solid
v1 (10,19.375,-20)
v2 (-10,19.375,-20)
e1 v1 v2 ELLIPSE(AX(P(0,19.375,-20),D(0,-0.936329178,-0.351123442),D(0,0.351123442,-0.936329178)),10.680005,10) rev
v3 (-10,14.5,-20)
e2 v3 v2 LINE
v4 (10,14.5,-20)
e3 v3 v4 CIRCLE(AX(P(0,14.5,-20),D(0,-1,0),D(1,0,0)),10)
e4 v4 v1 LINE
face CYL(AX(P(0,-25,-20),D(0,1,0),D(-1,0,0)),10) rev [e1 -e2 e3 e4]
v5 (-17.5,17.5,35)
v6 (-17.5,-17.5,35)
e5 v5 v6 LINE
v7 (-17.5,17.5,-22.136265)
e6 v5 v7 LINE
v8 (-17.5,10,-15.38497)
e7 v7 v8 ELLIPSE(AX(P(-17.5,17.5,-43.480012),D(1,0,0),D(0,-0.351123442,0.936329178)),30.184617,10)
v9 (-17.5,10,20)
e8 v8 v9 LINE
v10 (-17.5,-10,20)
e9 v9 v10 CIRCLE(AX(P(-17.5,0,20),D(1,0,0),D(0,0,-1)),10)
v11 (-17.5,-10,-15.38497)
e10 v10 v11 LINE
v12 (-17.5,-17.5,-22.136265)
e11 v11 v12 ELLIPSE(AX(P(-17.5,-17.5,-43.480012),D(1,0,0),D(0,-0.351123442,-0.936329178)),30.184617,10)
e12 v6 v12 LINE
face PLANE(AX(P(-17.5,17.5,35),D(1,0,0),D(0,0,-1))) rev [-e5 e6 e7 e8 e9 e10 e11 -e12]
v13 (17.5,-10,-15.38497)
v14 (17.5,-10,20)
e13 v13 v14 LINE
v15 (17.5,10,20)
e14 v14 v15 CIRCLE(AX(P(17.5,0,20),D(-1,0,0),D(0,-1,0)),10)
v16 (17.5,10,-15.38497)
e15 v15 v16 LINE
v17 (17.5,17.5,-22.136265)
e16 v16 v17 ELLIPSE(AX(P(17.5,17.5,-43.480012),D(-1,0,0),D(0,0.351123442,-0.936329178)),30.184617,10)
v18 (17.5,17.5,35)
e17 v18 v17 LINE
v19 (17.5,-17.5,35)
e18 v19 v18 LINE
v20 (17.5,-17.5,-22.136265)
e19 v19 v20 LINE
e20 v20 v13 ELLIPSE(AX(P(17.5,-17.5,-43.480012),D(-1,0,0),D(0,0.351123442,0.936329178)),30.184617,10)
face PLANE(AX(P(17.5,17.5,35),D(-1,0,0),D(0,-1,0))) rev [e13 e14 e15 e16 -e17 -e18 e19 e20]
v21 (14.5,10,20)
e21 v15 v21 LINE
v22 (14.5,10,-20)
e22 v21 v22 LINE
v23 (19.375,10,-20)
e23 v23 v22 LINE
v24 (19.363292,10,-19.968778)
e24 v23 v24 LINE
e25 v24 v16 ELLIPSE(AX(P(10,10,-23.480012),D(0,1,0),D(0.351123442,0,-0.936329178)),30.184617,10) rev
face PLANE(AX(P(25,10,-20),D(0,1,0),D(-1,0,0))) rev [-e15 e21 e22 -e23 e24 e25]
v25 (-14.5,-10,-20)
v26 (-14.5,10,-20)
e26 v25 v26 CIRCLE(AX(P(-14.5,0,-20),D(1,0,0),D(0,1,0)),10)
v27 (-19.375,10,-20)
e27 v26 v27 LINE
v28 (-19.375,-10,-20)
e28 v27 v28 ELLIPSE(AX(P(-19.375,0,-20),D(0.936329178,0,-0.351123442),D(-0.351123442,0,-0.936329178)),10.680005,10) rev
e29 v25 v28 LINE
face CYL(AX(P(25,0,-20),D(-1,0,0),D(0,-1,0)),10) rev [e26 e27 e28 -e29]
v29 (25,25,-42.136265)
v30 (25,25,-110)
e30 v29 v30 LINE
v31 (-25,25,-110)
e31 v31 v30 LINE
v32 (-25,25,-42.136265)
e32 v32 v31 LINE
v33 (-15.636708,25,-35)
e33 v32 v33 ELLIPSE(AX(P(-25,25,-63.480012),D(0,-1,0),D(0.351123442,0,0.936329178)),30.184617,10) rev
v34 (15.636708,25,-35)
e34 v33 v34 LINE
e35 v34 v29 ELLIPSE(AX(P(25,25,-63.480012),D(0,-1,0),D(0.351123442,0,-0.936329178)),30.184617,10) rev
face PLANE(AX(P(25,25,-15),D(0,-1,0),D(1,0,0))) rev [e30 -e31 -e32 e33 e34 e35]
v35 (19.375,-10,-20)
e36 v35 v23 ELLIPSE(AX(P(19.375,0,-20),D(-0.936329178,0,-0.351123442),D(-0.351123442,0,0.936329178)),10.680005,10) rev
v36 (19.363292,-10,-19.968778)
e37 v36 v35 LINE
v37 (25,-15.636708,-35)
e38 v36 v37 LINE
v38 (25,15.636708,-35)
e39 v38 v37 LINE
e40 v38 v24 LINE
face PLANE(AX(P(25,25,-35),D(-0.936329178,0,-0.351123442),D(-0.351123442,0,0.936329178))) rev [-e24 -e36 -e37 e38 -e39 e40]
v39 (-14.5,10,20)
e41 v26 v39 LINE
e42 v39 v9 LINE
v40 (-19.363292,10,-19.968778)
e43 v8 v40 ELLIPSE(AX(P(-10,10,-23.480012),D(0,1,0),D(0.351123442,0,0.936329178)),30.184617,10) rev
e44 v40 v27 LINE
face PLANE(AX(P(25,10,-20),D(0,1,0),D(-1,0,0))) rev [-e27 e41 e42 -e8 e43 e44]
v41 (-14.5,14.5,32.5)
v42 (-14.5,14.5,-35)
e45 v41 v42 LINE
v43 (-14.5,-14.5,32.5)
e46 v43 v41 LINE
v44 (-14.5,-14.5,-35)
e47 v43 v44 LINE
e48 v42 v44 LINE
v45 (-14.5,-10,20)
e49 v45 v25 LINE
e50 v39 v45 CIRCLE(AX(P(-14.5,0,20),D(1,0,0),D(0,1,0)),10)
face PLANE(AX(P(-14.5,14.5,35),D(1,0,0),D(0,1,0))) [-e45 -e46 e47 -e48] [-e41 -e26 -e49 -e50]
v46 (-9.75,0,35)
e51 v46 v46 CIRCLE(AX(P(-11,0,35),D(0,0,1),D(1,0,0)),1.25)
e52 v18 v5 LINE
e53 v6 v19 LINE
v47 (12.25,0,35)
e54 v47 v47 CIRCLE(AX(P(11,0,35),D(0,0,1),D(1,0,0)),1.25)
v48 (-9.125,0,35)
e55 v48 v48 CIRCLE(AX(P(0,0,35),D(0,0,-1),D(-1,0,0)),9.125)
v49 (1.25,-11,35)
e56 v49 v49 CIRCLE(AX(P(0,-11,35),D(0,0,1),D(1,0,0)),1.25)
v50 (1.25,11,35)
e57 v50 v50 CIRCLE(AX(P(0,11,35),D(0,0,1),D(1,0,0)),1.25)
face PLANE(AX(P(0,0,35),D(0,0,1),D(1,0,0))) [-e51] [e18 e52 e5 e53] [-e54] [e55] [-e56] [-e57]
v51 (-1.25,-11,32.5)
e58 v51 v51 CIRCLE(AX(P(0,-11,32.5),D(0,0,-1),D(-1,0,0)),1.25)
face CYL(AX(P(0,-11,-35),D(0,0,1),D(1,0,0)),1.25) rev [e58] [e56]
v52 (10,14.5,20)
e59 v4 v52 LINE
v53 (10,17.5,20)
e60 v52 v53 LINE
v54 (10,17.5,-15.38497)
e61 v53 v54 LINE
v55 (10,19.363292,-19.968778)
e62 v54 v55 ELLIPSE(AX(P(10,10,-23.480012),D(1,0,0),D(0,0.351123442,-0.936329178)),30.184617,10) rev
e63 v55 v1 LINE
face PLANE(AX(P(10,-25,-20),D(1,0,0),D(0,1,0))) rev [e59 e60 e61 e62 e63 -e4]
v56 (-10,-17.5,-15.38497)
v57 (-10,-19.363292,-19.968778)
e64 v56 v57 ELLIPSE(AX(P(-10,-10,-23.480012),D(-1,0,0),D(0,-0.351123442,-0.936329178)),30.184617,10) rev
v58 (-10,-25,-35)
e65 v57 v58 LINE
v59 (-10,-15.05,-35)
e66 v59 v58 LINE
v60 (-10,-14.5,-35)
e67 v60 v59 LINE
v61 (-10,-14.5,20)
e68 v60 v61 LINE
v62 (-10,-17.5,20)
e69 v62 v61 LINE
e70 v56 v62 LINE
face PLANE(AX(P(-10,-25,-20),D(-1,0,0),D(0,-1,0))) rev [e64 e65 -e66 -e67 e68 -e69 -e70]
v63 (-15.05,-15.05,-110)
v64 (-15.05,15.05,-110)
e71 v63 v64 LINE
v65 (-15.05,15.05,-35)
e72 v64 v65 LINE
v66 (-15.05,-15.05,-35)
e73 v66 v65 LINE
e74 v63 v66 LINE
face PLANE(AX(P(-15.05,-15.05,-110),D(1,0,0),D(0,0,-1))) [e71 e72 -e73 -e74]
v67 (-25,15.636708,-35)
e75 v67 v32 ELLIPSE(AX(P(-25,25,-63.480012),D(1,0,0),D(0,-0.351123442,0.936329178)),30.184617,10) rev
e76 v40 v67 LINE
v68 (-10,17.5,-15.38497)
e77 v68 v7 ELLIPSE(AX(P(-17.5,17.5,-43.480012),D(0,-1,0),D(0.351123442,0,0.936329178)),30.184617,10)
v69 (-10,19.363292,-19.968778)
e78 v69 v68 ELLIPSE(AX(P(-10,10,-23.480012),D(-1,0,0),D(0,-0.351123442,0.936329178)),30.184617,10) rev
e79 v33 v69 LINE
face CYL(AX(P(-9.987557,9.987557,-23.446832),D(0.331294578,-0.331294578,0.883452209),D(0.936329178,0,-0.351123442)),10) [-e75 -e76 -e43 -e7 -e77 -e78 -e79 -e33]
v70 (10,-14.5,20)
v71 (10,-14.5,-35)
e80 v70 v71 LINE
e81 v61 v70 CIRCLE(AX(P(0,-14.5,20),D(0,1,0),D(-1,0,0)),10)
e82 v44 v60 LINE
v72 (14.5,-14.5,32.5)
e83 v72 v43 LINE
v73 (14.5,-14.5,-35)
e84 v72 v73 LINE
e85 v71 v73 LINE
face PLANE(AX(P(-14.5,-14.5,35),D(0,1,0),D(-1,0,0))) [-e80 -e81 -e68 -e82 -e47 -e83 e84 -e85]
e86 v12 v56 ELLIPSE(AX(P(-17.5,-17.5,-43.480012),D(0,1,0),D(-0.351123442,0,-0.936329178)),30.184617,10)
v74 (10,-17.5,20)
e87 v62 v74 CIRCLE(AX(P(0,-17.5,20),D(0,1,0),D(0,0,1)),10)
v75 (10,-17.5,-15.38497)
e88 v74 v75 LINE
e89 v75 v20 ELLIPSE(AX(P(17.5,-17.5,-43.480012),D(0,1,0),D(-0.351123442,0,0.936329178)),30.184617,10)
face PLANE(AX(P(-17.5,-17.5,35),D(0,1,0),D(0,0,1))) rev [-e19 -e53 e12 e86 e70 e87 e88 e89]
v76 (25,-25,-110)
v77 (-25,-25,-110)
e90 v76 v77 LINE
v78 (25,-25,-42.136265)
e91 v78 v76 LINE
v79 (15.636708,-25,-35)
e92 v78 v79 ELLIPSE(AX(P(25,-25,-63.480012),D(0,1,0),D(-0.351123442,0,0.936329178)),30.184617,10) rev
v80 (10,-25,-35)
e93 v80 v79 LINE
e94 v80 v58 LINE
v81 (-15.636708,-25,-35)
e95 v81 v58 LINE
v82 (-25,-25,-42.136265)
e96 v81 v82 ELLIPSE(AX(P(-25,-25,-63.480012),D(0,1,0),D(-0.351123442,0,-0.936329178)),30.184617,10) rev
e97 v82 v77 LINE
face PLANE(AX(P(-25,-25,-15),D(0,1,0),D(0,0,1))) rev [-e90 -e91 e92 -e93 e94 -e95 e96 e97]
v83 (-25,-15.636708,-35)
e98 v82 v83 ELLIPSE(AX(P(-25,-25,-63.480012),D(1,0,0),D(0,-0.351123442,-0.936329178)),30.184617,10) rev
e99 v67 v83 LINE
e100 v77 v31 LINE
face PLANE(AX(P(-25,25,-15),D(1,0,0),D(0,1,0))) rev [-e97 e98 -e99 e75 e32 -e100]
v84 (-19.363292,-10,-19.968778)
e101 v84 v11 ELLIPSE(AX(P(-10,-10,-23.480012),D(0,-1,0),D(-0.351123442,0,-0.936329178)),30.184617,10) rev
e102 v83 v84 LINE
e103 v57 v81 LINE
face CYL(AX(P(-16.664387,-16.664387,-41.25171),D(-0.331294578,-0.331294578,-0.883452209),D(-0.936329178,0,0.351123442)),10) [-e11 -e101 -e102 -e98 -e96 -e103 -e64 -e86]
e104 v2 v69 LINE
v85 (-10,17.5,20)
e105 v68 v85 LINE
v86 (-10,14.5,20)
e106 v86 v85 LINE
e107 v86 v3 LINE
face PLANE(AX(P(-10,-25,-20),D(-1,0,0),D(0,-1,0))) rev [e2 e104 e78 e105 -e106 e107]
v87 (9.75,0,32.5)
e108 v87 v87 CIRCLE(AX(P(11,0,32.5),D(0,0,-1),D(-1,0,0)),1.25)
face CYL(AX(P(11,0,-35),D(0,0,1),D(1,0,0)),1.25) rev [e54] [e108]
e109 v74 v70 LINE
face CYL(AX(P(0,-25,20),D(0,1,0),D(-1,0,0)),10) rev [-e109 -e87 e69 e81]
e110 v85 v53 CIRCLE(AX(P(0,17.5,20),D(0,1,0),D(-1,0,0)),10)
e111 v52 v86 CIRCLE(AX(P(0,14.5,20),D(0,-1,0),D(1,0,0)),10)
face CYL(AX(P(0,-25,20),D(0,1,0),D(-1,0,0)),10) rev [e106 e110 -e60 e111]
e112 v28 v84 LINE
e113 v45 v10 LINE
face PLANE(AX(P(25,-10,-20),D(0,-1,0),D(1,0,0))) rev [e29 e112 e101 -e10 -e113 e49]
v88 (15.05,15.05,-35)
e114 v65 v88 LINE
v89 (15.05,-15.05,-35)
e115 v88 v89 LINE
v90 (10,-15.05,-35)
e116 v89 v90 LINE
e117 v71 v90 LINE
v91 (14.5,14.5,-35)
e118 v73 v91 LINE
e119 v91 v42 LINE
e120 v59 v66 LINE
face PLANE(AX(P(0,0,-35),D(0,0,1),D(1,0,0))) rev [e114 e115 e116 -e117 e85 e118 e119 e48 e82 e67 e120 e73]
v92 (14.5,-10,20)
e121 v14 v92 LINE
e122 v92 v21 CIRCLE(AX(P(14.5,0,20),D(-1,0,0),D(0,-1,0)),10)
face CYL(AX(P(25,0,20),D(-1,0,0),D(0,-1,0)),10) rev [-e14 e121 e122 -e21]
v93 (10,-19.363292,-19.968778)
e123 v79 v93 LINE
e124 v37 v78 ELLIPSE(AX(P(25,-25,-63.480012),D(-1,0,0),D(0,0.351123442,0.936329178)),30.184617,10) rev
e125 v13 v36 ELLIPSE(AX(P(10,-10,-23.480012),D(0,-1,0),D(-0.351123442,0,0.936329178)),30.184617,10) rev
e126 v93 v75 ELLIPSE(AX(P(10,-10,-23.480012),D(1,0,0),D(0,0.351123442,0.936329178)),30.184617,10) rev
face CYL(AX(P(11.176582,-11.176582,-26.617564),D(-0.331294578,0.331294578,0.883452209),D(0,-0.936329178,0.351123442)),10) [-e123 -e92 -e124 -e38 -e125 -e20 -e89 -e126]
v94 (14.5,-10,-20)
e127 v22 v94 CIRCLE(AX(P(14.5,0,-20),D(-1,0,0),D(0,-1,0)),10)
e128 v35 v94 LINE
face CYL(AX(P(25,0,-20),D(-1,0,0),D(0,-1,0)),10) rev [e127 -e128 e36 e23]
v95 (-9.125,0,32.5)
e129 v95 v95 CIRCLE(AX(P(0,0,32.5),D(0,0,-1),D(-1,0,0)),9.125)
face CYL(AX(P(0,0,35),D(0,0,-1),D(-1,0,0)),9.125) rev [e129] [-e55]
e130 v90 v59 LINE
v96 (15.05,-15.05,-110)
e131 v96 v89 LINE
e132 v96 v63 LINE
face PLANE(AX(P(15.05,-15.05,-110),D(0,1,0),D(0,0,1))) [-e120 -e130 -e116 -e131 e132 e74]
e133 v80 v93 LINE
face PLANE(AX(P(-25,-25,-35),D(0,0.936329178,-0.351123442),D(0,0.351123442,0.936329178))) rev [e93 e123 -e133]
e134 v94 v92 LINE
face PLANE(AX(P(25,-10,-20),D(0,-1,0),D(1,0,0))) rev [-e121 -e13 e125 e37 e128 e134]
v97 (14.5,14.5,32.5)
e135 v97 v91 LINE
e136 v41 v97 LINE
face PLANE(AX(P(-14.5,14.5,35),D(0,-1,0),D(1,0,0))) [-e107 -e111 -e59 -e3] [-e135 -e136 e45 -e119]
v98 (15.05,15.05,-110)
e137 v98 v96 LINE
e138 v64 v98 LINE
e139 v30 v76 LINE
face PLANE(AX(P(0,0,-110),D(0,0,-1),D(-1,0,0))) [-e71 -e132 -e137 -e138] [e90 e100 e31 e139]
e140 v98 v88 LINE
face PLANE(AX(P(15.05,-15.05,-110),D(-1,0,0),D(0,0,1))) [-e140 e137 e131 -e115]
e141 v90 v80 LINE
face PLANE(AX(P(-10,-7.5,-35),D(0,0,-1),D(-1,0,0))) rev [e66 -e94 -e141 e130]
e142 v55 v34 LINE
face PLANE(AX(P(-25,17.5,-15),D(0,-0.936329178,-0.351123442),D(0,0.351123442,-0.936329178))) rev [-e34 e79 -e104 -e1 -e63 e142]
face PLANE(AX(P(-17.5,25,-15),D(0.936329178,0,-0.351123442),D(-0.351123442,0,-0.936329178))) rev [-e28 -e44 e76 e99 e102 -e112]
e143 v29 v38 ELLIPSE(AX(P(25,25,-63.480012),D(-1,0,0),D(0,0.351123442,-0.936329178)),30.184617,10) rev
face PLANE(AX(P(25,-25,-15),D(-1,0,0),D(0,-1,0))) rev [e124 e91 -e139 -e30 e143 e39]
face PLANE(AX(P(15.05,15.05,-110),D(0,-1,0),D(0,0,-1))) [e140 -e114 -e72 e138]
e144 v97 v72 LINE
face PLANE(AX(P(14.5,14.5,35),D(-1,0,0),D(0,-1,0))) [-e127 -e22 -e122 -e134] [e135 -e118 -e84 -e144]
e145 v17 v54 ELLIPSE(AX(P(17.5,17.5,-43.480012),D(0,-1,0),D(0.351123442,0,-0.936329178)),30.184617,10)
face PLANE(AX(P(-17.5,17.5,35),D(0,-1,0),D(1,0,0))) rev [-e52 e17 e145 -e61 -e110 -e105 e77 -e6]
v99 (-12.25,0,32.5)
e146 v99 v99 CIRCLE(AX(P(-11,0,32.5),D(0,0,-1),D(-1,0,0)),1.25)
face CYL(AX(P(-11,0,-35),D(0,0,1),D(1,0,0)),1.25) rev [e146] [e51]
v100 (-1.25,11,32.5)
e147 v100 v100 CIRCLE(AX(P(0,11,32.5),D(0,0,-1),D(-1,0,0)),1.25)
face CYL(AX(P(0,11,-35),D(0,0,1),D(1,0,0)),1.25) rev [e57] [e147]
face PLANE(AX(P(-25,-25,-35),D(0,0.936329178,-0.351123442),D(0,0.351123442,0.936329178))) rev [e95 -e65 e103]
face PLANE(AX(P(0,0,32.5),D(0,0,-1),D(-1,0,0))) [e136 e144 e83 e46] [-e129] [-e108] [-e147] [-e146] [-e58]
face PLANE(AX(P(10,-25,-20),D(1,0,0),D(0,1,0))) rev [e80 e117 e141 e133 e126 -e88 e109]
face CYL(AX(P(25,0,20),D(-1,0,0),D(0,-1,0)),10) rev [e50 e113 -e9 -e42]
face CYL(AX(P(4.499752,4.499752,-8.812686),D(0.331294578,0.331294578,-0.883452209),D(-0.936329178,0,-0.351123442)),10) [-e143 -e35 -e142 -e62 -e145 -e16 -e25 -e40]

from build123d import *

# Parameters (mm, degrees)
IZIM1_W                     = 35
IZIM1_H                     = 35
IZIM1_W_2                   = 29
IZIM1_H_2                   = 29
Y_KSEKLIK_EKSTR_ZYON1_DEPTH = 35
IZIM2_W                     = 35
IZIM2_H                     = 35
Y_KSEKLIK_EKSTR_ZYON2_DEPTH = 2.5
IZIM7_R                     = 1.25
KES_EKSTR_ZYON5_DEPTH       = 75.246212025
IZIM5_R                     = 9.125
KES_EKSTR_ZYON3_DEPTH       = 72.894019223
IZIM10_W                    = 50
IZIM10_H                    = 50
IZIM10_W_2                  = 30.1
IZIM10_H_2                  = 30.1
Y_KSEKLIK_EKSTR_ZYON3_DEPTH = 75
IZIM12_W                    = 50
IZIM12_H                    = 50
IZIM12_W_2                  = 35
IZIM12_H_2                  = 35
Y_KSEKLIK_EKSTR_ZYON4_DEPTH = 20
KES_EKSTR_ZYON1_DEPTH       = 121.545634512
KES_EKSTR_ZYON6_START       = -10
KES_EKSTR_ZYON6_DEPTH       = 10
DAIRESEL_KAPLAMA1_COUNT     = 4
KES_EKSTR_ZYON7_DEPTH       = 124.389626793
KES_EKSTR_ZYON8_DEPTH       = 124.389626793
RADYUS4_R                   = 10
KES_EKSTR_ZYON9_DEPTH       = 121.545634512


with BuildPart() as part:
    # Çizim1 → Yükseklik-Ekstrüzyon1 (new, symmetric)
    with BuildSketch(Plane.XY):
        Rectangle(IZIM1_W, IZIM1_H)
        Rectangle(IZIM1_W_2, IZIM1_H_2, mode=Mode.SUBTRACT)
    extrude(amount=Y_KSEKLIK_EKSTR_ZYON1_DEPTH, both=True)

    # Çizim2 → Yükseklik-Ekstrüzyon2 (add)
    with BuildSketch(Plane.XY.offset(35)):
        Rectangle(IZIM2_W, IZIM2_H)
    extrude(amount=-Y_KSEKLIK_EKSTR_ZYON2_DEPTH)

    # Çizim7 → Kes-Ekstrüzyon5 (cut, through all)
    with BuildSketch(Plane.XY.offset(35)):
        with Locations((-11, 0)):
            Circle(IZIM7_R)
        with Locations((11, 0)):
            Circle(IZIM7_R)
        with Locations((0, 11)):
            Circle(IZIM7_R)
        with Locations((0, -11)):
            Circle(IZIM7_R)
    extrude(amount=-KES_EKSTR_ZYON5_DEPTH, mode=Mode.SUBTRACT)

    # Çizim5 → Kes-Ekstrüzyon3 (cut, through all)
    with BuildSketch(Plane(origin=(0, 0, 32.5), x_dir=(-1, 0, 0), z_dir=(0, 0, -1))):
        Circle(IZIM5_R)
    extrude(amount=-KES_EKSTR_ZYON3_DEPTH, mode=Mode.SUBTRACT)



with BuildPart() as body_2:
    # Çizim10 → Yükseklik-Ekstrüzyon3 (new body)
    with BuildSketch(Plane(origin=(0, 0, -35), x_dir=(-1, 0, 0), z_dir=(0, 0, -1))):
        Rectangle(IZIM10_W, IZIM10_H)
        Rectangle(IZIM10_W_2, IZIM10_H_2, mode=Mode.SUBTRACT)
    extrude(amount=Y_KSEKLIK_EKSTR_ZYON3_DEPTH)


with BuildPart() as part_1:
    add(part.part)

    add(body_2.part)  # Yükseklik-Ekstrüzyon4 merges body 2
    # Çizim12 → Yükseklik-Ekstrüzyon4 (add)
    with BuildSketch(Plane.XY.offset(-35)):
        Rectangle(IZIM12_W, IZIM12_H)
        Rectangle(IZIM12_W_2, IZIM12_H_2, mode=Mode.SUBTRACT)
    extrude(amount=Y_KSEKLIK_EKSTR_ZYON4_DEPTH)

    # Çizim3 → Kes-Ekstrüzyon1 (cut, through all)
    with BuildSketch(Plane(origin=(0, 17.5, 0), x_dir=(1, 0, 0), z_dir=(0, 1, 0))):
        with BuildLine():
            Line((10, 20), (10, -20))
            ThreePointArc((10, -20), (0, -30), (-10, -20))
            Line((-10, -20), (-10, 20))
            ThreePointArc((-10, 20), (0, 30), (10, 20))
        make_face()
    kes_ekstr_zyon1 = extrude(amount=-KES_EKSTR_ZYON1_DEPTH, mode=Mode.SUBTRACT)

    # Çizim8 → Kes-Ekstrüzyon6 (cut)
    with BuildSketch(Plane.XZ.offset(17.5).offset(KES_EKSTR_ZYON6_START)):
        with BuildLine():
            Line((-10, -20), (-10, -35))
            Line((-10, -35), (10, -35))
            Line((10, -35), (10, -20))
            ThreePointArc((10, -20), (0, -30), (-10, -20))
        make_face()
    extrude(amount=KES_EKSTR_ZYON6_DEPTH, mode=Mode.SUBTRACT)

    # Dairesel Kaplama1: Kes-Ekstrüzyon1 ×4 about axis
    dairesel_kaplama1_axis = Axis((0, 0, 0), (0, 0, 1))
    for i in range(1, DAIRESEL_KAPLAMA1_COUNT):
        add(kes_ekstr_zyon1.rotate(dairesel_kaplama1_axis, i * 360 / DAIRESEL_KAPLAMA1_COUNT), mode=Mode.SUBTRACT)

    # Çizim13 → Kes-Ekstrüzyon7 (cut, through all)
    with BuildSketch(Plane(origin=(25, 0, 0), x_dir=(0, 0, -1), z_dir=(1, 0, 0))):
        Polygon((15, 25), (15, 17.5), (35, 25), align=None)
        Polygon((15, -17.5), (15, -25), (35, -25), align=None)
    extrude(amount=-KES_EKSTR_ZYON7_DEPTH, mode=Mode.SUBTRACT)

    # Çizim14 → Kes-Ekstrüzyon8 (cut, through all)
    with BuildSketch(Plane.XZ.offset(25)):
        Polygon((-17.5, -15), (-25, -35), (-25, -15), align=None)
        Polygon((17.5, -15), (25, -15), (25, -35), align=None)
    extrude(amount=-KES_EKSTR_ZYON8_DEPTH, mode=Mode.SUBTRACT)

    # Radyus4
    # the kernel refuses this fillet: 10 mm, written as the material it takes off along each edge
    with BuildSketch(Plane(origin=(32.317073171, 32.317073171, -54.512195122), x_dir=(-0.9435273723846194, 0.11632529248577513, -0.31020077996206696), z_dir=(-0.33129457822453995, -0.3312945782245377, 0.883452208598773))) as radyus4_piece_1_section:
        with BuildLine():
            CenterArc((RADYUS4_R * 0.883452208599, RADYUS4_R), RADYUS4_R, 187.08188169, 82.91811831)
            Line((-RADYUS4_R * 0.108918765444, RADYUS4_R * 0.876712328767), (0, 0))
            Line((0, 0), (RADYUS4_R * 0.883452208599, 0))
        make_face()
    radyus4_piece_1 = extrude(amount=66.811073275, mode=Mode.PRIVATE)
    radyus4_piece_1 = split(radyus4_piece_1, bisect_by=Plane(origin=(17.5, 21.25, -29.89398757), z_dir=(1, 0, 0)), keep=Keep.TOP, mode=Mode.PRIVATE)
    add(radyus4_piece_1, mode=Mode.SUBTRACT)
    with BuildSketch(Plane(origin=(32.317073171, 32.317073171, -54.512195122), x_dir=(-0.9435273723846194, 0.11632529248577513, -0.31020077996206696), z_dir=(-0.33129457822453995, -0.3312945782245377, 0.883452208598773))) as radyus4_piece_2_section:
        with BuildLine():
            CenterArc((RADYUS4_R * 0.883452208599, RADYUS4_R), RADYUS4_R, 187.08188169, 82.91811831)
            Line((-RADYUS4_R * 0.108918765444, RADYUS4_R * 0.876712328767), (0, 0))
            Line((0, 0), (RADYUS4_R * 0.883452208599, 0))
        make_face()
    radyus4_piece_2 = extrude(amount=66.811073275, mode=Mode.PRIVATE)
    radyus4_piece_2 = split(radyus4_piece_2, bisect_by=Plane(origin=(16.256655696, 17.5, -22.379324277), z_dir=(0, 1, 0)), keep=Keep.TOP, mode=Mode.PRIVATE)
    add(radyus4_piece_2, mode=Mode.SUBTRACT)
    with BuildSketch(Plane(origin=(-10.182926829, 10.182926829, 4.512195122), x_dir=(0.943527372384614, 0.11632529248577986, -0.3102007799620813), z_dir=(-0.33129457822455505, 0.3312945782245359, -0.883452208598768))) as radyus4_piece_3_section:
        with BuildLine():
            CenterArc((RADYUS4_R * 0.883452208599, RADYUS4_R), RADYUS4_R, 187.08188169, 82.91811831)
            Line((-RADYUS4_R * 0.108918765444, RADYUS4_R * 0.876712328767), (0, 0))
            Line((0, 0), (RADYUS4_R * 0.883452208599, 0))
        make_face()
    radyus4_piece_3 = extrude(amount=66.811073275, mode=Mode.PRIVATE)
    radyus4_piece_3 = split(radyus4_piece_3, bisect_by=Plane(origin=(-17.5, 13.216664443, -19.287647888), z_dir=(-1, 0, 0)), keep=Keep.TOP, mode=Mode.PRIVATE)
    add(radyus4_piece_3, mode=Mode.SUBTRACT)
    with BuildSketch(Plane(origin=(-10.182926829, 10.182926829, 4.512195122), x_dir=(0.943527372384614, 0.11632529248577986, -0.3102007799620813), z_dir=(-0.33129457822455505, 0.3312945782245359, -0.883452208598768))) as radyus4_piece_4_section:
        with BuildLine():
            CenterArc((RADYUS4_R * 0.883452208599, RADYUS4_R), RADYUS4_R, 187.08188169, 82.91811831)
            Line((-RADYUS4_R * 0.108918765444, RADYUS4_R * 0.876712328767), (0, 0))
            Line((0, 0), (RADYUS4_R * 0.883452208599, 0))
        make_face()
    radyus4_piece_4 = extrude(amount=66.811073275, mode=Mode.PRIVATE)
    radyus4_piece_4 = split(radyus4_piece_4, bisect_by=Plane(origin=(-13.216664444, 17.5, -19.287647888), z_dir=(0, 1, 0)), keep=Keep.TOP, mode=Mode.PRIVATE)
    add(radyus4_piece_4, mode=Mode.SUBTRACT)
    with BuildSketch(Plane(origin=(10.182926829, -10.182926829, 4.512195122), x_dir=(0.11632529248577561, 0.9435273723846188, -0.3102007799620686), z_dir=(0.33129457822453945, -0.3312945782245416, -0.8834522085987717))) as radyus4_piece_5_section:
        with BuildLine():
            CenterArc((RADYUS4_R * 0.883452208599, -RADYUS4_R), RADYUS4_R, 90, 82.91811831)
            Line((-RADYUS4_R * 0.108918765444, -RADYUS4_R * 0.876712328767), (0, 0))
            Line((0, 0), (RADYUS4_R * 0.883452208599, 0))
        make_face()
    radyus4_piece_5 = extrude(amount=66.811073275, mode=Mode.PRIVATE)
    radyus4_piece_5 = split(radyus4_piece_5, bisect_by=Plane(origin=(13.216664443, -17.5, -19.287647888), z_dir=(0, -1, 0)), keep=Keep.TOP, mode=Mode.PRIVATE)
    add(radyus4_piece_5, mode=Mode.SUBTRACT)
    with BuildSketch(Plane(origin=(10.182926829, -10.182926829, 4.512195122), x_dir=(0.11632529248577561, 0.9435273723846188, -0.3102007799620686), z_dir=(0.33129457822453945, -0.3312945782245416, -0.8834522085987717))) as radyus4_piece_6_section:
        with BuildLine():
            CenterArc((RADYUS4_R * 0.883452208599, -RADYUS4_R), RADYUS4_R, 90, 82.91811831)
            Line((-RADYUS4_R * 0.108918765444, -RADYUS4_R * 0.876712328767), (0, 0))
            Line((0, 0), (RADYUS4_R * 0.883452208599, 0))
        make_face()
    radyus4_piece_6 = extrude(amount=66.811073275, mode=Mode.PRIVATE)
    radyus4_piece_6 = split(radyus4_piece_6, bisect_by=Plane(origin=(17.5, -13.216664444, -19.287647888), z_dir=(1, 0, 0)), keep=Keep.TOP, mode=Mode.PRIVATE)
    add(radyus4_piece_6, mode=Mode.SUBTRACT)
    with BuildSketch(Plane(origin=(-32.317073171, -32.317073171, -54.512195122), x_dir=(-0.11632529248578077, 0.9435273723846194, -0.31020077996206435), z_dir=(0.33129457822455455, 0.33129457822453956, 0.8834522085987668))) as radyus4_piece_7_section:
        with BuildLine():
            CenterArc((RADYUS4_R * 0.883452208599, -RADYUS4_R), RADYUS4_R, 90, 82.91811831)
            Line((-RADYUS4_R * 0.108918765444, -RADYUS4_R * 0.876712328767), (0, 0))
            Line((0, 0), (RADYUS4_R * 0.883452208599, 0))
        make_face()
    radyus4_piece_7 = extrude(amount=66.811073275, mode=Mode.PRIVATE)
    radyus4_piece_7 = split(radyus4_piece_7, bisect_by=Plane(origin=(-21.25, -17.5, -29.89398757), z_dir=(0, -1, 0)), keep=Keep.TOP, mode=Mode.PRIVATE)
    add(radyus4_piece_7, mode=Mode.SUBTRACT)
    with BuildSketch(Plane(origin=(-32.317073171, -32.317073171, -54.512195122), x_dir=(-0.11632529248578077, 0.9435273723846194, -0.31020077996206435), z_dir=(0.33129457822455455, 0.33129457822453956, 0.8834522085987668))) as radyus4_piece_8_section:
        with BuildLine():
            CenterArc((RADYUS4_R * 0.883452208599, -RADYUS4_R), RADYUS4_R, 90, 82.91811831)
            Line((-RADYUS4_R * 0.108918765444, -RADYUS4_R * 0.876712328767), (0, 0))
            Line((0, 0), (RADYUS4_R * 0.883452208599, 0))
        make_face()
    radyus4_piece_8 = extrude(amount=66.811073275, mode=Mode.PRIVATE)
    radyus4_piece_8 = split(radyus4_piece_8, bisect_by=Plane(origin=(-17.5, -16.256655696, -22.379324277), z_dir=(-1, 0, 0)), keep=Keep.TOP, mode=Mode.PRIVATE)
    add(radyus4_piece_8, mode=Mode.SUBTRACT)

    # Çizim15 → Kes-Ekstrüzyon9 (cut, through all)
    with BuildSketch(Plane(origin=(0, -17.5, 0), x_dir=(1, 0, 0), z_dir=(0, 1, 0))):
        with BuildLine():
            Line((10, 20), (10, 35))
            Line((10, 35), (-10, 35))
            Line((-10, 35), (-10, 20))
            ThreePointArc((-10, 20), (0, 30), (10, 20))
        make_face()
    extrude(amount=-KES_EKSTR_ZYON9_DEPTH, mode=Mode.SUBTRACT)


solid = part_1.part
